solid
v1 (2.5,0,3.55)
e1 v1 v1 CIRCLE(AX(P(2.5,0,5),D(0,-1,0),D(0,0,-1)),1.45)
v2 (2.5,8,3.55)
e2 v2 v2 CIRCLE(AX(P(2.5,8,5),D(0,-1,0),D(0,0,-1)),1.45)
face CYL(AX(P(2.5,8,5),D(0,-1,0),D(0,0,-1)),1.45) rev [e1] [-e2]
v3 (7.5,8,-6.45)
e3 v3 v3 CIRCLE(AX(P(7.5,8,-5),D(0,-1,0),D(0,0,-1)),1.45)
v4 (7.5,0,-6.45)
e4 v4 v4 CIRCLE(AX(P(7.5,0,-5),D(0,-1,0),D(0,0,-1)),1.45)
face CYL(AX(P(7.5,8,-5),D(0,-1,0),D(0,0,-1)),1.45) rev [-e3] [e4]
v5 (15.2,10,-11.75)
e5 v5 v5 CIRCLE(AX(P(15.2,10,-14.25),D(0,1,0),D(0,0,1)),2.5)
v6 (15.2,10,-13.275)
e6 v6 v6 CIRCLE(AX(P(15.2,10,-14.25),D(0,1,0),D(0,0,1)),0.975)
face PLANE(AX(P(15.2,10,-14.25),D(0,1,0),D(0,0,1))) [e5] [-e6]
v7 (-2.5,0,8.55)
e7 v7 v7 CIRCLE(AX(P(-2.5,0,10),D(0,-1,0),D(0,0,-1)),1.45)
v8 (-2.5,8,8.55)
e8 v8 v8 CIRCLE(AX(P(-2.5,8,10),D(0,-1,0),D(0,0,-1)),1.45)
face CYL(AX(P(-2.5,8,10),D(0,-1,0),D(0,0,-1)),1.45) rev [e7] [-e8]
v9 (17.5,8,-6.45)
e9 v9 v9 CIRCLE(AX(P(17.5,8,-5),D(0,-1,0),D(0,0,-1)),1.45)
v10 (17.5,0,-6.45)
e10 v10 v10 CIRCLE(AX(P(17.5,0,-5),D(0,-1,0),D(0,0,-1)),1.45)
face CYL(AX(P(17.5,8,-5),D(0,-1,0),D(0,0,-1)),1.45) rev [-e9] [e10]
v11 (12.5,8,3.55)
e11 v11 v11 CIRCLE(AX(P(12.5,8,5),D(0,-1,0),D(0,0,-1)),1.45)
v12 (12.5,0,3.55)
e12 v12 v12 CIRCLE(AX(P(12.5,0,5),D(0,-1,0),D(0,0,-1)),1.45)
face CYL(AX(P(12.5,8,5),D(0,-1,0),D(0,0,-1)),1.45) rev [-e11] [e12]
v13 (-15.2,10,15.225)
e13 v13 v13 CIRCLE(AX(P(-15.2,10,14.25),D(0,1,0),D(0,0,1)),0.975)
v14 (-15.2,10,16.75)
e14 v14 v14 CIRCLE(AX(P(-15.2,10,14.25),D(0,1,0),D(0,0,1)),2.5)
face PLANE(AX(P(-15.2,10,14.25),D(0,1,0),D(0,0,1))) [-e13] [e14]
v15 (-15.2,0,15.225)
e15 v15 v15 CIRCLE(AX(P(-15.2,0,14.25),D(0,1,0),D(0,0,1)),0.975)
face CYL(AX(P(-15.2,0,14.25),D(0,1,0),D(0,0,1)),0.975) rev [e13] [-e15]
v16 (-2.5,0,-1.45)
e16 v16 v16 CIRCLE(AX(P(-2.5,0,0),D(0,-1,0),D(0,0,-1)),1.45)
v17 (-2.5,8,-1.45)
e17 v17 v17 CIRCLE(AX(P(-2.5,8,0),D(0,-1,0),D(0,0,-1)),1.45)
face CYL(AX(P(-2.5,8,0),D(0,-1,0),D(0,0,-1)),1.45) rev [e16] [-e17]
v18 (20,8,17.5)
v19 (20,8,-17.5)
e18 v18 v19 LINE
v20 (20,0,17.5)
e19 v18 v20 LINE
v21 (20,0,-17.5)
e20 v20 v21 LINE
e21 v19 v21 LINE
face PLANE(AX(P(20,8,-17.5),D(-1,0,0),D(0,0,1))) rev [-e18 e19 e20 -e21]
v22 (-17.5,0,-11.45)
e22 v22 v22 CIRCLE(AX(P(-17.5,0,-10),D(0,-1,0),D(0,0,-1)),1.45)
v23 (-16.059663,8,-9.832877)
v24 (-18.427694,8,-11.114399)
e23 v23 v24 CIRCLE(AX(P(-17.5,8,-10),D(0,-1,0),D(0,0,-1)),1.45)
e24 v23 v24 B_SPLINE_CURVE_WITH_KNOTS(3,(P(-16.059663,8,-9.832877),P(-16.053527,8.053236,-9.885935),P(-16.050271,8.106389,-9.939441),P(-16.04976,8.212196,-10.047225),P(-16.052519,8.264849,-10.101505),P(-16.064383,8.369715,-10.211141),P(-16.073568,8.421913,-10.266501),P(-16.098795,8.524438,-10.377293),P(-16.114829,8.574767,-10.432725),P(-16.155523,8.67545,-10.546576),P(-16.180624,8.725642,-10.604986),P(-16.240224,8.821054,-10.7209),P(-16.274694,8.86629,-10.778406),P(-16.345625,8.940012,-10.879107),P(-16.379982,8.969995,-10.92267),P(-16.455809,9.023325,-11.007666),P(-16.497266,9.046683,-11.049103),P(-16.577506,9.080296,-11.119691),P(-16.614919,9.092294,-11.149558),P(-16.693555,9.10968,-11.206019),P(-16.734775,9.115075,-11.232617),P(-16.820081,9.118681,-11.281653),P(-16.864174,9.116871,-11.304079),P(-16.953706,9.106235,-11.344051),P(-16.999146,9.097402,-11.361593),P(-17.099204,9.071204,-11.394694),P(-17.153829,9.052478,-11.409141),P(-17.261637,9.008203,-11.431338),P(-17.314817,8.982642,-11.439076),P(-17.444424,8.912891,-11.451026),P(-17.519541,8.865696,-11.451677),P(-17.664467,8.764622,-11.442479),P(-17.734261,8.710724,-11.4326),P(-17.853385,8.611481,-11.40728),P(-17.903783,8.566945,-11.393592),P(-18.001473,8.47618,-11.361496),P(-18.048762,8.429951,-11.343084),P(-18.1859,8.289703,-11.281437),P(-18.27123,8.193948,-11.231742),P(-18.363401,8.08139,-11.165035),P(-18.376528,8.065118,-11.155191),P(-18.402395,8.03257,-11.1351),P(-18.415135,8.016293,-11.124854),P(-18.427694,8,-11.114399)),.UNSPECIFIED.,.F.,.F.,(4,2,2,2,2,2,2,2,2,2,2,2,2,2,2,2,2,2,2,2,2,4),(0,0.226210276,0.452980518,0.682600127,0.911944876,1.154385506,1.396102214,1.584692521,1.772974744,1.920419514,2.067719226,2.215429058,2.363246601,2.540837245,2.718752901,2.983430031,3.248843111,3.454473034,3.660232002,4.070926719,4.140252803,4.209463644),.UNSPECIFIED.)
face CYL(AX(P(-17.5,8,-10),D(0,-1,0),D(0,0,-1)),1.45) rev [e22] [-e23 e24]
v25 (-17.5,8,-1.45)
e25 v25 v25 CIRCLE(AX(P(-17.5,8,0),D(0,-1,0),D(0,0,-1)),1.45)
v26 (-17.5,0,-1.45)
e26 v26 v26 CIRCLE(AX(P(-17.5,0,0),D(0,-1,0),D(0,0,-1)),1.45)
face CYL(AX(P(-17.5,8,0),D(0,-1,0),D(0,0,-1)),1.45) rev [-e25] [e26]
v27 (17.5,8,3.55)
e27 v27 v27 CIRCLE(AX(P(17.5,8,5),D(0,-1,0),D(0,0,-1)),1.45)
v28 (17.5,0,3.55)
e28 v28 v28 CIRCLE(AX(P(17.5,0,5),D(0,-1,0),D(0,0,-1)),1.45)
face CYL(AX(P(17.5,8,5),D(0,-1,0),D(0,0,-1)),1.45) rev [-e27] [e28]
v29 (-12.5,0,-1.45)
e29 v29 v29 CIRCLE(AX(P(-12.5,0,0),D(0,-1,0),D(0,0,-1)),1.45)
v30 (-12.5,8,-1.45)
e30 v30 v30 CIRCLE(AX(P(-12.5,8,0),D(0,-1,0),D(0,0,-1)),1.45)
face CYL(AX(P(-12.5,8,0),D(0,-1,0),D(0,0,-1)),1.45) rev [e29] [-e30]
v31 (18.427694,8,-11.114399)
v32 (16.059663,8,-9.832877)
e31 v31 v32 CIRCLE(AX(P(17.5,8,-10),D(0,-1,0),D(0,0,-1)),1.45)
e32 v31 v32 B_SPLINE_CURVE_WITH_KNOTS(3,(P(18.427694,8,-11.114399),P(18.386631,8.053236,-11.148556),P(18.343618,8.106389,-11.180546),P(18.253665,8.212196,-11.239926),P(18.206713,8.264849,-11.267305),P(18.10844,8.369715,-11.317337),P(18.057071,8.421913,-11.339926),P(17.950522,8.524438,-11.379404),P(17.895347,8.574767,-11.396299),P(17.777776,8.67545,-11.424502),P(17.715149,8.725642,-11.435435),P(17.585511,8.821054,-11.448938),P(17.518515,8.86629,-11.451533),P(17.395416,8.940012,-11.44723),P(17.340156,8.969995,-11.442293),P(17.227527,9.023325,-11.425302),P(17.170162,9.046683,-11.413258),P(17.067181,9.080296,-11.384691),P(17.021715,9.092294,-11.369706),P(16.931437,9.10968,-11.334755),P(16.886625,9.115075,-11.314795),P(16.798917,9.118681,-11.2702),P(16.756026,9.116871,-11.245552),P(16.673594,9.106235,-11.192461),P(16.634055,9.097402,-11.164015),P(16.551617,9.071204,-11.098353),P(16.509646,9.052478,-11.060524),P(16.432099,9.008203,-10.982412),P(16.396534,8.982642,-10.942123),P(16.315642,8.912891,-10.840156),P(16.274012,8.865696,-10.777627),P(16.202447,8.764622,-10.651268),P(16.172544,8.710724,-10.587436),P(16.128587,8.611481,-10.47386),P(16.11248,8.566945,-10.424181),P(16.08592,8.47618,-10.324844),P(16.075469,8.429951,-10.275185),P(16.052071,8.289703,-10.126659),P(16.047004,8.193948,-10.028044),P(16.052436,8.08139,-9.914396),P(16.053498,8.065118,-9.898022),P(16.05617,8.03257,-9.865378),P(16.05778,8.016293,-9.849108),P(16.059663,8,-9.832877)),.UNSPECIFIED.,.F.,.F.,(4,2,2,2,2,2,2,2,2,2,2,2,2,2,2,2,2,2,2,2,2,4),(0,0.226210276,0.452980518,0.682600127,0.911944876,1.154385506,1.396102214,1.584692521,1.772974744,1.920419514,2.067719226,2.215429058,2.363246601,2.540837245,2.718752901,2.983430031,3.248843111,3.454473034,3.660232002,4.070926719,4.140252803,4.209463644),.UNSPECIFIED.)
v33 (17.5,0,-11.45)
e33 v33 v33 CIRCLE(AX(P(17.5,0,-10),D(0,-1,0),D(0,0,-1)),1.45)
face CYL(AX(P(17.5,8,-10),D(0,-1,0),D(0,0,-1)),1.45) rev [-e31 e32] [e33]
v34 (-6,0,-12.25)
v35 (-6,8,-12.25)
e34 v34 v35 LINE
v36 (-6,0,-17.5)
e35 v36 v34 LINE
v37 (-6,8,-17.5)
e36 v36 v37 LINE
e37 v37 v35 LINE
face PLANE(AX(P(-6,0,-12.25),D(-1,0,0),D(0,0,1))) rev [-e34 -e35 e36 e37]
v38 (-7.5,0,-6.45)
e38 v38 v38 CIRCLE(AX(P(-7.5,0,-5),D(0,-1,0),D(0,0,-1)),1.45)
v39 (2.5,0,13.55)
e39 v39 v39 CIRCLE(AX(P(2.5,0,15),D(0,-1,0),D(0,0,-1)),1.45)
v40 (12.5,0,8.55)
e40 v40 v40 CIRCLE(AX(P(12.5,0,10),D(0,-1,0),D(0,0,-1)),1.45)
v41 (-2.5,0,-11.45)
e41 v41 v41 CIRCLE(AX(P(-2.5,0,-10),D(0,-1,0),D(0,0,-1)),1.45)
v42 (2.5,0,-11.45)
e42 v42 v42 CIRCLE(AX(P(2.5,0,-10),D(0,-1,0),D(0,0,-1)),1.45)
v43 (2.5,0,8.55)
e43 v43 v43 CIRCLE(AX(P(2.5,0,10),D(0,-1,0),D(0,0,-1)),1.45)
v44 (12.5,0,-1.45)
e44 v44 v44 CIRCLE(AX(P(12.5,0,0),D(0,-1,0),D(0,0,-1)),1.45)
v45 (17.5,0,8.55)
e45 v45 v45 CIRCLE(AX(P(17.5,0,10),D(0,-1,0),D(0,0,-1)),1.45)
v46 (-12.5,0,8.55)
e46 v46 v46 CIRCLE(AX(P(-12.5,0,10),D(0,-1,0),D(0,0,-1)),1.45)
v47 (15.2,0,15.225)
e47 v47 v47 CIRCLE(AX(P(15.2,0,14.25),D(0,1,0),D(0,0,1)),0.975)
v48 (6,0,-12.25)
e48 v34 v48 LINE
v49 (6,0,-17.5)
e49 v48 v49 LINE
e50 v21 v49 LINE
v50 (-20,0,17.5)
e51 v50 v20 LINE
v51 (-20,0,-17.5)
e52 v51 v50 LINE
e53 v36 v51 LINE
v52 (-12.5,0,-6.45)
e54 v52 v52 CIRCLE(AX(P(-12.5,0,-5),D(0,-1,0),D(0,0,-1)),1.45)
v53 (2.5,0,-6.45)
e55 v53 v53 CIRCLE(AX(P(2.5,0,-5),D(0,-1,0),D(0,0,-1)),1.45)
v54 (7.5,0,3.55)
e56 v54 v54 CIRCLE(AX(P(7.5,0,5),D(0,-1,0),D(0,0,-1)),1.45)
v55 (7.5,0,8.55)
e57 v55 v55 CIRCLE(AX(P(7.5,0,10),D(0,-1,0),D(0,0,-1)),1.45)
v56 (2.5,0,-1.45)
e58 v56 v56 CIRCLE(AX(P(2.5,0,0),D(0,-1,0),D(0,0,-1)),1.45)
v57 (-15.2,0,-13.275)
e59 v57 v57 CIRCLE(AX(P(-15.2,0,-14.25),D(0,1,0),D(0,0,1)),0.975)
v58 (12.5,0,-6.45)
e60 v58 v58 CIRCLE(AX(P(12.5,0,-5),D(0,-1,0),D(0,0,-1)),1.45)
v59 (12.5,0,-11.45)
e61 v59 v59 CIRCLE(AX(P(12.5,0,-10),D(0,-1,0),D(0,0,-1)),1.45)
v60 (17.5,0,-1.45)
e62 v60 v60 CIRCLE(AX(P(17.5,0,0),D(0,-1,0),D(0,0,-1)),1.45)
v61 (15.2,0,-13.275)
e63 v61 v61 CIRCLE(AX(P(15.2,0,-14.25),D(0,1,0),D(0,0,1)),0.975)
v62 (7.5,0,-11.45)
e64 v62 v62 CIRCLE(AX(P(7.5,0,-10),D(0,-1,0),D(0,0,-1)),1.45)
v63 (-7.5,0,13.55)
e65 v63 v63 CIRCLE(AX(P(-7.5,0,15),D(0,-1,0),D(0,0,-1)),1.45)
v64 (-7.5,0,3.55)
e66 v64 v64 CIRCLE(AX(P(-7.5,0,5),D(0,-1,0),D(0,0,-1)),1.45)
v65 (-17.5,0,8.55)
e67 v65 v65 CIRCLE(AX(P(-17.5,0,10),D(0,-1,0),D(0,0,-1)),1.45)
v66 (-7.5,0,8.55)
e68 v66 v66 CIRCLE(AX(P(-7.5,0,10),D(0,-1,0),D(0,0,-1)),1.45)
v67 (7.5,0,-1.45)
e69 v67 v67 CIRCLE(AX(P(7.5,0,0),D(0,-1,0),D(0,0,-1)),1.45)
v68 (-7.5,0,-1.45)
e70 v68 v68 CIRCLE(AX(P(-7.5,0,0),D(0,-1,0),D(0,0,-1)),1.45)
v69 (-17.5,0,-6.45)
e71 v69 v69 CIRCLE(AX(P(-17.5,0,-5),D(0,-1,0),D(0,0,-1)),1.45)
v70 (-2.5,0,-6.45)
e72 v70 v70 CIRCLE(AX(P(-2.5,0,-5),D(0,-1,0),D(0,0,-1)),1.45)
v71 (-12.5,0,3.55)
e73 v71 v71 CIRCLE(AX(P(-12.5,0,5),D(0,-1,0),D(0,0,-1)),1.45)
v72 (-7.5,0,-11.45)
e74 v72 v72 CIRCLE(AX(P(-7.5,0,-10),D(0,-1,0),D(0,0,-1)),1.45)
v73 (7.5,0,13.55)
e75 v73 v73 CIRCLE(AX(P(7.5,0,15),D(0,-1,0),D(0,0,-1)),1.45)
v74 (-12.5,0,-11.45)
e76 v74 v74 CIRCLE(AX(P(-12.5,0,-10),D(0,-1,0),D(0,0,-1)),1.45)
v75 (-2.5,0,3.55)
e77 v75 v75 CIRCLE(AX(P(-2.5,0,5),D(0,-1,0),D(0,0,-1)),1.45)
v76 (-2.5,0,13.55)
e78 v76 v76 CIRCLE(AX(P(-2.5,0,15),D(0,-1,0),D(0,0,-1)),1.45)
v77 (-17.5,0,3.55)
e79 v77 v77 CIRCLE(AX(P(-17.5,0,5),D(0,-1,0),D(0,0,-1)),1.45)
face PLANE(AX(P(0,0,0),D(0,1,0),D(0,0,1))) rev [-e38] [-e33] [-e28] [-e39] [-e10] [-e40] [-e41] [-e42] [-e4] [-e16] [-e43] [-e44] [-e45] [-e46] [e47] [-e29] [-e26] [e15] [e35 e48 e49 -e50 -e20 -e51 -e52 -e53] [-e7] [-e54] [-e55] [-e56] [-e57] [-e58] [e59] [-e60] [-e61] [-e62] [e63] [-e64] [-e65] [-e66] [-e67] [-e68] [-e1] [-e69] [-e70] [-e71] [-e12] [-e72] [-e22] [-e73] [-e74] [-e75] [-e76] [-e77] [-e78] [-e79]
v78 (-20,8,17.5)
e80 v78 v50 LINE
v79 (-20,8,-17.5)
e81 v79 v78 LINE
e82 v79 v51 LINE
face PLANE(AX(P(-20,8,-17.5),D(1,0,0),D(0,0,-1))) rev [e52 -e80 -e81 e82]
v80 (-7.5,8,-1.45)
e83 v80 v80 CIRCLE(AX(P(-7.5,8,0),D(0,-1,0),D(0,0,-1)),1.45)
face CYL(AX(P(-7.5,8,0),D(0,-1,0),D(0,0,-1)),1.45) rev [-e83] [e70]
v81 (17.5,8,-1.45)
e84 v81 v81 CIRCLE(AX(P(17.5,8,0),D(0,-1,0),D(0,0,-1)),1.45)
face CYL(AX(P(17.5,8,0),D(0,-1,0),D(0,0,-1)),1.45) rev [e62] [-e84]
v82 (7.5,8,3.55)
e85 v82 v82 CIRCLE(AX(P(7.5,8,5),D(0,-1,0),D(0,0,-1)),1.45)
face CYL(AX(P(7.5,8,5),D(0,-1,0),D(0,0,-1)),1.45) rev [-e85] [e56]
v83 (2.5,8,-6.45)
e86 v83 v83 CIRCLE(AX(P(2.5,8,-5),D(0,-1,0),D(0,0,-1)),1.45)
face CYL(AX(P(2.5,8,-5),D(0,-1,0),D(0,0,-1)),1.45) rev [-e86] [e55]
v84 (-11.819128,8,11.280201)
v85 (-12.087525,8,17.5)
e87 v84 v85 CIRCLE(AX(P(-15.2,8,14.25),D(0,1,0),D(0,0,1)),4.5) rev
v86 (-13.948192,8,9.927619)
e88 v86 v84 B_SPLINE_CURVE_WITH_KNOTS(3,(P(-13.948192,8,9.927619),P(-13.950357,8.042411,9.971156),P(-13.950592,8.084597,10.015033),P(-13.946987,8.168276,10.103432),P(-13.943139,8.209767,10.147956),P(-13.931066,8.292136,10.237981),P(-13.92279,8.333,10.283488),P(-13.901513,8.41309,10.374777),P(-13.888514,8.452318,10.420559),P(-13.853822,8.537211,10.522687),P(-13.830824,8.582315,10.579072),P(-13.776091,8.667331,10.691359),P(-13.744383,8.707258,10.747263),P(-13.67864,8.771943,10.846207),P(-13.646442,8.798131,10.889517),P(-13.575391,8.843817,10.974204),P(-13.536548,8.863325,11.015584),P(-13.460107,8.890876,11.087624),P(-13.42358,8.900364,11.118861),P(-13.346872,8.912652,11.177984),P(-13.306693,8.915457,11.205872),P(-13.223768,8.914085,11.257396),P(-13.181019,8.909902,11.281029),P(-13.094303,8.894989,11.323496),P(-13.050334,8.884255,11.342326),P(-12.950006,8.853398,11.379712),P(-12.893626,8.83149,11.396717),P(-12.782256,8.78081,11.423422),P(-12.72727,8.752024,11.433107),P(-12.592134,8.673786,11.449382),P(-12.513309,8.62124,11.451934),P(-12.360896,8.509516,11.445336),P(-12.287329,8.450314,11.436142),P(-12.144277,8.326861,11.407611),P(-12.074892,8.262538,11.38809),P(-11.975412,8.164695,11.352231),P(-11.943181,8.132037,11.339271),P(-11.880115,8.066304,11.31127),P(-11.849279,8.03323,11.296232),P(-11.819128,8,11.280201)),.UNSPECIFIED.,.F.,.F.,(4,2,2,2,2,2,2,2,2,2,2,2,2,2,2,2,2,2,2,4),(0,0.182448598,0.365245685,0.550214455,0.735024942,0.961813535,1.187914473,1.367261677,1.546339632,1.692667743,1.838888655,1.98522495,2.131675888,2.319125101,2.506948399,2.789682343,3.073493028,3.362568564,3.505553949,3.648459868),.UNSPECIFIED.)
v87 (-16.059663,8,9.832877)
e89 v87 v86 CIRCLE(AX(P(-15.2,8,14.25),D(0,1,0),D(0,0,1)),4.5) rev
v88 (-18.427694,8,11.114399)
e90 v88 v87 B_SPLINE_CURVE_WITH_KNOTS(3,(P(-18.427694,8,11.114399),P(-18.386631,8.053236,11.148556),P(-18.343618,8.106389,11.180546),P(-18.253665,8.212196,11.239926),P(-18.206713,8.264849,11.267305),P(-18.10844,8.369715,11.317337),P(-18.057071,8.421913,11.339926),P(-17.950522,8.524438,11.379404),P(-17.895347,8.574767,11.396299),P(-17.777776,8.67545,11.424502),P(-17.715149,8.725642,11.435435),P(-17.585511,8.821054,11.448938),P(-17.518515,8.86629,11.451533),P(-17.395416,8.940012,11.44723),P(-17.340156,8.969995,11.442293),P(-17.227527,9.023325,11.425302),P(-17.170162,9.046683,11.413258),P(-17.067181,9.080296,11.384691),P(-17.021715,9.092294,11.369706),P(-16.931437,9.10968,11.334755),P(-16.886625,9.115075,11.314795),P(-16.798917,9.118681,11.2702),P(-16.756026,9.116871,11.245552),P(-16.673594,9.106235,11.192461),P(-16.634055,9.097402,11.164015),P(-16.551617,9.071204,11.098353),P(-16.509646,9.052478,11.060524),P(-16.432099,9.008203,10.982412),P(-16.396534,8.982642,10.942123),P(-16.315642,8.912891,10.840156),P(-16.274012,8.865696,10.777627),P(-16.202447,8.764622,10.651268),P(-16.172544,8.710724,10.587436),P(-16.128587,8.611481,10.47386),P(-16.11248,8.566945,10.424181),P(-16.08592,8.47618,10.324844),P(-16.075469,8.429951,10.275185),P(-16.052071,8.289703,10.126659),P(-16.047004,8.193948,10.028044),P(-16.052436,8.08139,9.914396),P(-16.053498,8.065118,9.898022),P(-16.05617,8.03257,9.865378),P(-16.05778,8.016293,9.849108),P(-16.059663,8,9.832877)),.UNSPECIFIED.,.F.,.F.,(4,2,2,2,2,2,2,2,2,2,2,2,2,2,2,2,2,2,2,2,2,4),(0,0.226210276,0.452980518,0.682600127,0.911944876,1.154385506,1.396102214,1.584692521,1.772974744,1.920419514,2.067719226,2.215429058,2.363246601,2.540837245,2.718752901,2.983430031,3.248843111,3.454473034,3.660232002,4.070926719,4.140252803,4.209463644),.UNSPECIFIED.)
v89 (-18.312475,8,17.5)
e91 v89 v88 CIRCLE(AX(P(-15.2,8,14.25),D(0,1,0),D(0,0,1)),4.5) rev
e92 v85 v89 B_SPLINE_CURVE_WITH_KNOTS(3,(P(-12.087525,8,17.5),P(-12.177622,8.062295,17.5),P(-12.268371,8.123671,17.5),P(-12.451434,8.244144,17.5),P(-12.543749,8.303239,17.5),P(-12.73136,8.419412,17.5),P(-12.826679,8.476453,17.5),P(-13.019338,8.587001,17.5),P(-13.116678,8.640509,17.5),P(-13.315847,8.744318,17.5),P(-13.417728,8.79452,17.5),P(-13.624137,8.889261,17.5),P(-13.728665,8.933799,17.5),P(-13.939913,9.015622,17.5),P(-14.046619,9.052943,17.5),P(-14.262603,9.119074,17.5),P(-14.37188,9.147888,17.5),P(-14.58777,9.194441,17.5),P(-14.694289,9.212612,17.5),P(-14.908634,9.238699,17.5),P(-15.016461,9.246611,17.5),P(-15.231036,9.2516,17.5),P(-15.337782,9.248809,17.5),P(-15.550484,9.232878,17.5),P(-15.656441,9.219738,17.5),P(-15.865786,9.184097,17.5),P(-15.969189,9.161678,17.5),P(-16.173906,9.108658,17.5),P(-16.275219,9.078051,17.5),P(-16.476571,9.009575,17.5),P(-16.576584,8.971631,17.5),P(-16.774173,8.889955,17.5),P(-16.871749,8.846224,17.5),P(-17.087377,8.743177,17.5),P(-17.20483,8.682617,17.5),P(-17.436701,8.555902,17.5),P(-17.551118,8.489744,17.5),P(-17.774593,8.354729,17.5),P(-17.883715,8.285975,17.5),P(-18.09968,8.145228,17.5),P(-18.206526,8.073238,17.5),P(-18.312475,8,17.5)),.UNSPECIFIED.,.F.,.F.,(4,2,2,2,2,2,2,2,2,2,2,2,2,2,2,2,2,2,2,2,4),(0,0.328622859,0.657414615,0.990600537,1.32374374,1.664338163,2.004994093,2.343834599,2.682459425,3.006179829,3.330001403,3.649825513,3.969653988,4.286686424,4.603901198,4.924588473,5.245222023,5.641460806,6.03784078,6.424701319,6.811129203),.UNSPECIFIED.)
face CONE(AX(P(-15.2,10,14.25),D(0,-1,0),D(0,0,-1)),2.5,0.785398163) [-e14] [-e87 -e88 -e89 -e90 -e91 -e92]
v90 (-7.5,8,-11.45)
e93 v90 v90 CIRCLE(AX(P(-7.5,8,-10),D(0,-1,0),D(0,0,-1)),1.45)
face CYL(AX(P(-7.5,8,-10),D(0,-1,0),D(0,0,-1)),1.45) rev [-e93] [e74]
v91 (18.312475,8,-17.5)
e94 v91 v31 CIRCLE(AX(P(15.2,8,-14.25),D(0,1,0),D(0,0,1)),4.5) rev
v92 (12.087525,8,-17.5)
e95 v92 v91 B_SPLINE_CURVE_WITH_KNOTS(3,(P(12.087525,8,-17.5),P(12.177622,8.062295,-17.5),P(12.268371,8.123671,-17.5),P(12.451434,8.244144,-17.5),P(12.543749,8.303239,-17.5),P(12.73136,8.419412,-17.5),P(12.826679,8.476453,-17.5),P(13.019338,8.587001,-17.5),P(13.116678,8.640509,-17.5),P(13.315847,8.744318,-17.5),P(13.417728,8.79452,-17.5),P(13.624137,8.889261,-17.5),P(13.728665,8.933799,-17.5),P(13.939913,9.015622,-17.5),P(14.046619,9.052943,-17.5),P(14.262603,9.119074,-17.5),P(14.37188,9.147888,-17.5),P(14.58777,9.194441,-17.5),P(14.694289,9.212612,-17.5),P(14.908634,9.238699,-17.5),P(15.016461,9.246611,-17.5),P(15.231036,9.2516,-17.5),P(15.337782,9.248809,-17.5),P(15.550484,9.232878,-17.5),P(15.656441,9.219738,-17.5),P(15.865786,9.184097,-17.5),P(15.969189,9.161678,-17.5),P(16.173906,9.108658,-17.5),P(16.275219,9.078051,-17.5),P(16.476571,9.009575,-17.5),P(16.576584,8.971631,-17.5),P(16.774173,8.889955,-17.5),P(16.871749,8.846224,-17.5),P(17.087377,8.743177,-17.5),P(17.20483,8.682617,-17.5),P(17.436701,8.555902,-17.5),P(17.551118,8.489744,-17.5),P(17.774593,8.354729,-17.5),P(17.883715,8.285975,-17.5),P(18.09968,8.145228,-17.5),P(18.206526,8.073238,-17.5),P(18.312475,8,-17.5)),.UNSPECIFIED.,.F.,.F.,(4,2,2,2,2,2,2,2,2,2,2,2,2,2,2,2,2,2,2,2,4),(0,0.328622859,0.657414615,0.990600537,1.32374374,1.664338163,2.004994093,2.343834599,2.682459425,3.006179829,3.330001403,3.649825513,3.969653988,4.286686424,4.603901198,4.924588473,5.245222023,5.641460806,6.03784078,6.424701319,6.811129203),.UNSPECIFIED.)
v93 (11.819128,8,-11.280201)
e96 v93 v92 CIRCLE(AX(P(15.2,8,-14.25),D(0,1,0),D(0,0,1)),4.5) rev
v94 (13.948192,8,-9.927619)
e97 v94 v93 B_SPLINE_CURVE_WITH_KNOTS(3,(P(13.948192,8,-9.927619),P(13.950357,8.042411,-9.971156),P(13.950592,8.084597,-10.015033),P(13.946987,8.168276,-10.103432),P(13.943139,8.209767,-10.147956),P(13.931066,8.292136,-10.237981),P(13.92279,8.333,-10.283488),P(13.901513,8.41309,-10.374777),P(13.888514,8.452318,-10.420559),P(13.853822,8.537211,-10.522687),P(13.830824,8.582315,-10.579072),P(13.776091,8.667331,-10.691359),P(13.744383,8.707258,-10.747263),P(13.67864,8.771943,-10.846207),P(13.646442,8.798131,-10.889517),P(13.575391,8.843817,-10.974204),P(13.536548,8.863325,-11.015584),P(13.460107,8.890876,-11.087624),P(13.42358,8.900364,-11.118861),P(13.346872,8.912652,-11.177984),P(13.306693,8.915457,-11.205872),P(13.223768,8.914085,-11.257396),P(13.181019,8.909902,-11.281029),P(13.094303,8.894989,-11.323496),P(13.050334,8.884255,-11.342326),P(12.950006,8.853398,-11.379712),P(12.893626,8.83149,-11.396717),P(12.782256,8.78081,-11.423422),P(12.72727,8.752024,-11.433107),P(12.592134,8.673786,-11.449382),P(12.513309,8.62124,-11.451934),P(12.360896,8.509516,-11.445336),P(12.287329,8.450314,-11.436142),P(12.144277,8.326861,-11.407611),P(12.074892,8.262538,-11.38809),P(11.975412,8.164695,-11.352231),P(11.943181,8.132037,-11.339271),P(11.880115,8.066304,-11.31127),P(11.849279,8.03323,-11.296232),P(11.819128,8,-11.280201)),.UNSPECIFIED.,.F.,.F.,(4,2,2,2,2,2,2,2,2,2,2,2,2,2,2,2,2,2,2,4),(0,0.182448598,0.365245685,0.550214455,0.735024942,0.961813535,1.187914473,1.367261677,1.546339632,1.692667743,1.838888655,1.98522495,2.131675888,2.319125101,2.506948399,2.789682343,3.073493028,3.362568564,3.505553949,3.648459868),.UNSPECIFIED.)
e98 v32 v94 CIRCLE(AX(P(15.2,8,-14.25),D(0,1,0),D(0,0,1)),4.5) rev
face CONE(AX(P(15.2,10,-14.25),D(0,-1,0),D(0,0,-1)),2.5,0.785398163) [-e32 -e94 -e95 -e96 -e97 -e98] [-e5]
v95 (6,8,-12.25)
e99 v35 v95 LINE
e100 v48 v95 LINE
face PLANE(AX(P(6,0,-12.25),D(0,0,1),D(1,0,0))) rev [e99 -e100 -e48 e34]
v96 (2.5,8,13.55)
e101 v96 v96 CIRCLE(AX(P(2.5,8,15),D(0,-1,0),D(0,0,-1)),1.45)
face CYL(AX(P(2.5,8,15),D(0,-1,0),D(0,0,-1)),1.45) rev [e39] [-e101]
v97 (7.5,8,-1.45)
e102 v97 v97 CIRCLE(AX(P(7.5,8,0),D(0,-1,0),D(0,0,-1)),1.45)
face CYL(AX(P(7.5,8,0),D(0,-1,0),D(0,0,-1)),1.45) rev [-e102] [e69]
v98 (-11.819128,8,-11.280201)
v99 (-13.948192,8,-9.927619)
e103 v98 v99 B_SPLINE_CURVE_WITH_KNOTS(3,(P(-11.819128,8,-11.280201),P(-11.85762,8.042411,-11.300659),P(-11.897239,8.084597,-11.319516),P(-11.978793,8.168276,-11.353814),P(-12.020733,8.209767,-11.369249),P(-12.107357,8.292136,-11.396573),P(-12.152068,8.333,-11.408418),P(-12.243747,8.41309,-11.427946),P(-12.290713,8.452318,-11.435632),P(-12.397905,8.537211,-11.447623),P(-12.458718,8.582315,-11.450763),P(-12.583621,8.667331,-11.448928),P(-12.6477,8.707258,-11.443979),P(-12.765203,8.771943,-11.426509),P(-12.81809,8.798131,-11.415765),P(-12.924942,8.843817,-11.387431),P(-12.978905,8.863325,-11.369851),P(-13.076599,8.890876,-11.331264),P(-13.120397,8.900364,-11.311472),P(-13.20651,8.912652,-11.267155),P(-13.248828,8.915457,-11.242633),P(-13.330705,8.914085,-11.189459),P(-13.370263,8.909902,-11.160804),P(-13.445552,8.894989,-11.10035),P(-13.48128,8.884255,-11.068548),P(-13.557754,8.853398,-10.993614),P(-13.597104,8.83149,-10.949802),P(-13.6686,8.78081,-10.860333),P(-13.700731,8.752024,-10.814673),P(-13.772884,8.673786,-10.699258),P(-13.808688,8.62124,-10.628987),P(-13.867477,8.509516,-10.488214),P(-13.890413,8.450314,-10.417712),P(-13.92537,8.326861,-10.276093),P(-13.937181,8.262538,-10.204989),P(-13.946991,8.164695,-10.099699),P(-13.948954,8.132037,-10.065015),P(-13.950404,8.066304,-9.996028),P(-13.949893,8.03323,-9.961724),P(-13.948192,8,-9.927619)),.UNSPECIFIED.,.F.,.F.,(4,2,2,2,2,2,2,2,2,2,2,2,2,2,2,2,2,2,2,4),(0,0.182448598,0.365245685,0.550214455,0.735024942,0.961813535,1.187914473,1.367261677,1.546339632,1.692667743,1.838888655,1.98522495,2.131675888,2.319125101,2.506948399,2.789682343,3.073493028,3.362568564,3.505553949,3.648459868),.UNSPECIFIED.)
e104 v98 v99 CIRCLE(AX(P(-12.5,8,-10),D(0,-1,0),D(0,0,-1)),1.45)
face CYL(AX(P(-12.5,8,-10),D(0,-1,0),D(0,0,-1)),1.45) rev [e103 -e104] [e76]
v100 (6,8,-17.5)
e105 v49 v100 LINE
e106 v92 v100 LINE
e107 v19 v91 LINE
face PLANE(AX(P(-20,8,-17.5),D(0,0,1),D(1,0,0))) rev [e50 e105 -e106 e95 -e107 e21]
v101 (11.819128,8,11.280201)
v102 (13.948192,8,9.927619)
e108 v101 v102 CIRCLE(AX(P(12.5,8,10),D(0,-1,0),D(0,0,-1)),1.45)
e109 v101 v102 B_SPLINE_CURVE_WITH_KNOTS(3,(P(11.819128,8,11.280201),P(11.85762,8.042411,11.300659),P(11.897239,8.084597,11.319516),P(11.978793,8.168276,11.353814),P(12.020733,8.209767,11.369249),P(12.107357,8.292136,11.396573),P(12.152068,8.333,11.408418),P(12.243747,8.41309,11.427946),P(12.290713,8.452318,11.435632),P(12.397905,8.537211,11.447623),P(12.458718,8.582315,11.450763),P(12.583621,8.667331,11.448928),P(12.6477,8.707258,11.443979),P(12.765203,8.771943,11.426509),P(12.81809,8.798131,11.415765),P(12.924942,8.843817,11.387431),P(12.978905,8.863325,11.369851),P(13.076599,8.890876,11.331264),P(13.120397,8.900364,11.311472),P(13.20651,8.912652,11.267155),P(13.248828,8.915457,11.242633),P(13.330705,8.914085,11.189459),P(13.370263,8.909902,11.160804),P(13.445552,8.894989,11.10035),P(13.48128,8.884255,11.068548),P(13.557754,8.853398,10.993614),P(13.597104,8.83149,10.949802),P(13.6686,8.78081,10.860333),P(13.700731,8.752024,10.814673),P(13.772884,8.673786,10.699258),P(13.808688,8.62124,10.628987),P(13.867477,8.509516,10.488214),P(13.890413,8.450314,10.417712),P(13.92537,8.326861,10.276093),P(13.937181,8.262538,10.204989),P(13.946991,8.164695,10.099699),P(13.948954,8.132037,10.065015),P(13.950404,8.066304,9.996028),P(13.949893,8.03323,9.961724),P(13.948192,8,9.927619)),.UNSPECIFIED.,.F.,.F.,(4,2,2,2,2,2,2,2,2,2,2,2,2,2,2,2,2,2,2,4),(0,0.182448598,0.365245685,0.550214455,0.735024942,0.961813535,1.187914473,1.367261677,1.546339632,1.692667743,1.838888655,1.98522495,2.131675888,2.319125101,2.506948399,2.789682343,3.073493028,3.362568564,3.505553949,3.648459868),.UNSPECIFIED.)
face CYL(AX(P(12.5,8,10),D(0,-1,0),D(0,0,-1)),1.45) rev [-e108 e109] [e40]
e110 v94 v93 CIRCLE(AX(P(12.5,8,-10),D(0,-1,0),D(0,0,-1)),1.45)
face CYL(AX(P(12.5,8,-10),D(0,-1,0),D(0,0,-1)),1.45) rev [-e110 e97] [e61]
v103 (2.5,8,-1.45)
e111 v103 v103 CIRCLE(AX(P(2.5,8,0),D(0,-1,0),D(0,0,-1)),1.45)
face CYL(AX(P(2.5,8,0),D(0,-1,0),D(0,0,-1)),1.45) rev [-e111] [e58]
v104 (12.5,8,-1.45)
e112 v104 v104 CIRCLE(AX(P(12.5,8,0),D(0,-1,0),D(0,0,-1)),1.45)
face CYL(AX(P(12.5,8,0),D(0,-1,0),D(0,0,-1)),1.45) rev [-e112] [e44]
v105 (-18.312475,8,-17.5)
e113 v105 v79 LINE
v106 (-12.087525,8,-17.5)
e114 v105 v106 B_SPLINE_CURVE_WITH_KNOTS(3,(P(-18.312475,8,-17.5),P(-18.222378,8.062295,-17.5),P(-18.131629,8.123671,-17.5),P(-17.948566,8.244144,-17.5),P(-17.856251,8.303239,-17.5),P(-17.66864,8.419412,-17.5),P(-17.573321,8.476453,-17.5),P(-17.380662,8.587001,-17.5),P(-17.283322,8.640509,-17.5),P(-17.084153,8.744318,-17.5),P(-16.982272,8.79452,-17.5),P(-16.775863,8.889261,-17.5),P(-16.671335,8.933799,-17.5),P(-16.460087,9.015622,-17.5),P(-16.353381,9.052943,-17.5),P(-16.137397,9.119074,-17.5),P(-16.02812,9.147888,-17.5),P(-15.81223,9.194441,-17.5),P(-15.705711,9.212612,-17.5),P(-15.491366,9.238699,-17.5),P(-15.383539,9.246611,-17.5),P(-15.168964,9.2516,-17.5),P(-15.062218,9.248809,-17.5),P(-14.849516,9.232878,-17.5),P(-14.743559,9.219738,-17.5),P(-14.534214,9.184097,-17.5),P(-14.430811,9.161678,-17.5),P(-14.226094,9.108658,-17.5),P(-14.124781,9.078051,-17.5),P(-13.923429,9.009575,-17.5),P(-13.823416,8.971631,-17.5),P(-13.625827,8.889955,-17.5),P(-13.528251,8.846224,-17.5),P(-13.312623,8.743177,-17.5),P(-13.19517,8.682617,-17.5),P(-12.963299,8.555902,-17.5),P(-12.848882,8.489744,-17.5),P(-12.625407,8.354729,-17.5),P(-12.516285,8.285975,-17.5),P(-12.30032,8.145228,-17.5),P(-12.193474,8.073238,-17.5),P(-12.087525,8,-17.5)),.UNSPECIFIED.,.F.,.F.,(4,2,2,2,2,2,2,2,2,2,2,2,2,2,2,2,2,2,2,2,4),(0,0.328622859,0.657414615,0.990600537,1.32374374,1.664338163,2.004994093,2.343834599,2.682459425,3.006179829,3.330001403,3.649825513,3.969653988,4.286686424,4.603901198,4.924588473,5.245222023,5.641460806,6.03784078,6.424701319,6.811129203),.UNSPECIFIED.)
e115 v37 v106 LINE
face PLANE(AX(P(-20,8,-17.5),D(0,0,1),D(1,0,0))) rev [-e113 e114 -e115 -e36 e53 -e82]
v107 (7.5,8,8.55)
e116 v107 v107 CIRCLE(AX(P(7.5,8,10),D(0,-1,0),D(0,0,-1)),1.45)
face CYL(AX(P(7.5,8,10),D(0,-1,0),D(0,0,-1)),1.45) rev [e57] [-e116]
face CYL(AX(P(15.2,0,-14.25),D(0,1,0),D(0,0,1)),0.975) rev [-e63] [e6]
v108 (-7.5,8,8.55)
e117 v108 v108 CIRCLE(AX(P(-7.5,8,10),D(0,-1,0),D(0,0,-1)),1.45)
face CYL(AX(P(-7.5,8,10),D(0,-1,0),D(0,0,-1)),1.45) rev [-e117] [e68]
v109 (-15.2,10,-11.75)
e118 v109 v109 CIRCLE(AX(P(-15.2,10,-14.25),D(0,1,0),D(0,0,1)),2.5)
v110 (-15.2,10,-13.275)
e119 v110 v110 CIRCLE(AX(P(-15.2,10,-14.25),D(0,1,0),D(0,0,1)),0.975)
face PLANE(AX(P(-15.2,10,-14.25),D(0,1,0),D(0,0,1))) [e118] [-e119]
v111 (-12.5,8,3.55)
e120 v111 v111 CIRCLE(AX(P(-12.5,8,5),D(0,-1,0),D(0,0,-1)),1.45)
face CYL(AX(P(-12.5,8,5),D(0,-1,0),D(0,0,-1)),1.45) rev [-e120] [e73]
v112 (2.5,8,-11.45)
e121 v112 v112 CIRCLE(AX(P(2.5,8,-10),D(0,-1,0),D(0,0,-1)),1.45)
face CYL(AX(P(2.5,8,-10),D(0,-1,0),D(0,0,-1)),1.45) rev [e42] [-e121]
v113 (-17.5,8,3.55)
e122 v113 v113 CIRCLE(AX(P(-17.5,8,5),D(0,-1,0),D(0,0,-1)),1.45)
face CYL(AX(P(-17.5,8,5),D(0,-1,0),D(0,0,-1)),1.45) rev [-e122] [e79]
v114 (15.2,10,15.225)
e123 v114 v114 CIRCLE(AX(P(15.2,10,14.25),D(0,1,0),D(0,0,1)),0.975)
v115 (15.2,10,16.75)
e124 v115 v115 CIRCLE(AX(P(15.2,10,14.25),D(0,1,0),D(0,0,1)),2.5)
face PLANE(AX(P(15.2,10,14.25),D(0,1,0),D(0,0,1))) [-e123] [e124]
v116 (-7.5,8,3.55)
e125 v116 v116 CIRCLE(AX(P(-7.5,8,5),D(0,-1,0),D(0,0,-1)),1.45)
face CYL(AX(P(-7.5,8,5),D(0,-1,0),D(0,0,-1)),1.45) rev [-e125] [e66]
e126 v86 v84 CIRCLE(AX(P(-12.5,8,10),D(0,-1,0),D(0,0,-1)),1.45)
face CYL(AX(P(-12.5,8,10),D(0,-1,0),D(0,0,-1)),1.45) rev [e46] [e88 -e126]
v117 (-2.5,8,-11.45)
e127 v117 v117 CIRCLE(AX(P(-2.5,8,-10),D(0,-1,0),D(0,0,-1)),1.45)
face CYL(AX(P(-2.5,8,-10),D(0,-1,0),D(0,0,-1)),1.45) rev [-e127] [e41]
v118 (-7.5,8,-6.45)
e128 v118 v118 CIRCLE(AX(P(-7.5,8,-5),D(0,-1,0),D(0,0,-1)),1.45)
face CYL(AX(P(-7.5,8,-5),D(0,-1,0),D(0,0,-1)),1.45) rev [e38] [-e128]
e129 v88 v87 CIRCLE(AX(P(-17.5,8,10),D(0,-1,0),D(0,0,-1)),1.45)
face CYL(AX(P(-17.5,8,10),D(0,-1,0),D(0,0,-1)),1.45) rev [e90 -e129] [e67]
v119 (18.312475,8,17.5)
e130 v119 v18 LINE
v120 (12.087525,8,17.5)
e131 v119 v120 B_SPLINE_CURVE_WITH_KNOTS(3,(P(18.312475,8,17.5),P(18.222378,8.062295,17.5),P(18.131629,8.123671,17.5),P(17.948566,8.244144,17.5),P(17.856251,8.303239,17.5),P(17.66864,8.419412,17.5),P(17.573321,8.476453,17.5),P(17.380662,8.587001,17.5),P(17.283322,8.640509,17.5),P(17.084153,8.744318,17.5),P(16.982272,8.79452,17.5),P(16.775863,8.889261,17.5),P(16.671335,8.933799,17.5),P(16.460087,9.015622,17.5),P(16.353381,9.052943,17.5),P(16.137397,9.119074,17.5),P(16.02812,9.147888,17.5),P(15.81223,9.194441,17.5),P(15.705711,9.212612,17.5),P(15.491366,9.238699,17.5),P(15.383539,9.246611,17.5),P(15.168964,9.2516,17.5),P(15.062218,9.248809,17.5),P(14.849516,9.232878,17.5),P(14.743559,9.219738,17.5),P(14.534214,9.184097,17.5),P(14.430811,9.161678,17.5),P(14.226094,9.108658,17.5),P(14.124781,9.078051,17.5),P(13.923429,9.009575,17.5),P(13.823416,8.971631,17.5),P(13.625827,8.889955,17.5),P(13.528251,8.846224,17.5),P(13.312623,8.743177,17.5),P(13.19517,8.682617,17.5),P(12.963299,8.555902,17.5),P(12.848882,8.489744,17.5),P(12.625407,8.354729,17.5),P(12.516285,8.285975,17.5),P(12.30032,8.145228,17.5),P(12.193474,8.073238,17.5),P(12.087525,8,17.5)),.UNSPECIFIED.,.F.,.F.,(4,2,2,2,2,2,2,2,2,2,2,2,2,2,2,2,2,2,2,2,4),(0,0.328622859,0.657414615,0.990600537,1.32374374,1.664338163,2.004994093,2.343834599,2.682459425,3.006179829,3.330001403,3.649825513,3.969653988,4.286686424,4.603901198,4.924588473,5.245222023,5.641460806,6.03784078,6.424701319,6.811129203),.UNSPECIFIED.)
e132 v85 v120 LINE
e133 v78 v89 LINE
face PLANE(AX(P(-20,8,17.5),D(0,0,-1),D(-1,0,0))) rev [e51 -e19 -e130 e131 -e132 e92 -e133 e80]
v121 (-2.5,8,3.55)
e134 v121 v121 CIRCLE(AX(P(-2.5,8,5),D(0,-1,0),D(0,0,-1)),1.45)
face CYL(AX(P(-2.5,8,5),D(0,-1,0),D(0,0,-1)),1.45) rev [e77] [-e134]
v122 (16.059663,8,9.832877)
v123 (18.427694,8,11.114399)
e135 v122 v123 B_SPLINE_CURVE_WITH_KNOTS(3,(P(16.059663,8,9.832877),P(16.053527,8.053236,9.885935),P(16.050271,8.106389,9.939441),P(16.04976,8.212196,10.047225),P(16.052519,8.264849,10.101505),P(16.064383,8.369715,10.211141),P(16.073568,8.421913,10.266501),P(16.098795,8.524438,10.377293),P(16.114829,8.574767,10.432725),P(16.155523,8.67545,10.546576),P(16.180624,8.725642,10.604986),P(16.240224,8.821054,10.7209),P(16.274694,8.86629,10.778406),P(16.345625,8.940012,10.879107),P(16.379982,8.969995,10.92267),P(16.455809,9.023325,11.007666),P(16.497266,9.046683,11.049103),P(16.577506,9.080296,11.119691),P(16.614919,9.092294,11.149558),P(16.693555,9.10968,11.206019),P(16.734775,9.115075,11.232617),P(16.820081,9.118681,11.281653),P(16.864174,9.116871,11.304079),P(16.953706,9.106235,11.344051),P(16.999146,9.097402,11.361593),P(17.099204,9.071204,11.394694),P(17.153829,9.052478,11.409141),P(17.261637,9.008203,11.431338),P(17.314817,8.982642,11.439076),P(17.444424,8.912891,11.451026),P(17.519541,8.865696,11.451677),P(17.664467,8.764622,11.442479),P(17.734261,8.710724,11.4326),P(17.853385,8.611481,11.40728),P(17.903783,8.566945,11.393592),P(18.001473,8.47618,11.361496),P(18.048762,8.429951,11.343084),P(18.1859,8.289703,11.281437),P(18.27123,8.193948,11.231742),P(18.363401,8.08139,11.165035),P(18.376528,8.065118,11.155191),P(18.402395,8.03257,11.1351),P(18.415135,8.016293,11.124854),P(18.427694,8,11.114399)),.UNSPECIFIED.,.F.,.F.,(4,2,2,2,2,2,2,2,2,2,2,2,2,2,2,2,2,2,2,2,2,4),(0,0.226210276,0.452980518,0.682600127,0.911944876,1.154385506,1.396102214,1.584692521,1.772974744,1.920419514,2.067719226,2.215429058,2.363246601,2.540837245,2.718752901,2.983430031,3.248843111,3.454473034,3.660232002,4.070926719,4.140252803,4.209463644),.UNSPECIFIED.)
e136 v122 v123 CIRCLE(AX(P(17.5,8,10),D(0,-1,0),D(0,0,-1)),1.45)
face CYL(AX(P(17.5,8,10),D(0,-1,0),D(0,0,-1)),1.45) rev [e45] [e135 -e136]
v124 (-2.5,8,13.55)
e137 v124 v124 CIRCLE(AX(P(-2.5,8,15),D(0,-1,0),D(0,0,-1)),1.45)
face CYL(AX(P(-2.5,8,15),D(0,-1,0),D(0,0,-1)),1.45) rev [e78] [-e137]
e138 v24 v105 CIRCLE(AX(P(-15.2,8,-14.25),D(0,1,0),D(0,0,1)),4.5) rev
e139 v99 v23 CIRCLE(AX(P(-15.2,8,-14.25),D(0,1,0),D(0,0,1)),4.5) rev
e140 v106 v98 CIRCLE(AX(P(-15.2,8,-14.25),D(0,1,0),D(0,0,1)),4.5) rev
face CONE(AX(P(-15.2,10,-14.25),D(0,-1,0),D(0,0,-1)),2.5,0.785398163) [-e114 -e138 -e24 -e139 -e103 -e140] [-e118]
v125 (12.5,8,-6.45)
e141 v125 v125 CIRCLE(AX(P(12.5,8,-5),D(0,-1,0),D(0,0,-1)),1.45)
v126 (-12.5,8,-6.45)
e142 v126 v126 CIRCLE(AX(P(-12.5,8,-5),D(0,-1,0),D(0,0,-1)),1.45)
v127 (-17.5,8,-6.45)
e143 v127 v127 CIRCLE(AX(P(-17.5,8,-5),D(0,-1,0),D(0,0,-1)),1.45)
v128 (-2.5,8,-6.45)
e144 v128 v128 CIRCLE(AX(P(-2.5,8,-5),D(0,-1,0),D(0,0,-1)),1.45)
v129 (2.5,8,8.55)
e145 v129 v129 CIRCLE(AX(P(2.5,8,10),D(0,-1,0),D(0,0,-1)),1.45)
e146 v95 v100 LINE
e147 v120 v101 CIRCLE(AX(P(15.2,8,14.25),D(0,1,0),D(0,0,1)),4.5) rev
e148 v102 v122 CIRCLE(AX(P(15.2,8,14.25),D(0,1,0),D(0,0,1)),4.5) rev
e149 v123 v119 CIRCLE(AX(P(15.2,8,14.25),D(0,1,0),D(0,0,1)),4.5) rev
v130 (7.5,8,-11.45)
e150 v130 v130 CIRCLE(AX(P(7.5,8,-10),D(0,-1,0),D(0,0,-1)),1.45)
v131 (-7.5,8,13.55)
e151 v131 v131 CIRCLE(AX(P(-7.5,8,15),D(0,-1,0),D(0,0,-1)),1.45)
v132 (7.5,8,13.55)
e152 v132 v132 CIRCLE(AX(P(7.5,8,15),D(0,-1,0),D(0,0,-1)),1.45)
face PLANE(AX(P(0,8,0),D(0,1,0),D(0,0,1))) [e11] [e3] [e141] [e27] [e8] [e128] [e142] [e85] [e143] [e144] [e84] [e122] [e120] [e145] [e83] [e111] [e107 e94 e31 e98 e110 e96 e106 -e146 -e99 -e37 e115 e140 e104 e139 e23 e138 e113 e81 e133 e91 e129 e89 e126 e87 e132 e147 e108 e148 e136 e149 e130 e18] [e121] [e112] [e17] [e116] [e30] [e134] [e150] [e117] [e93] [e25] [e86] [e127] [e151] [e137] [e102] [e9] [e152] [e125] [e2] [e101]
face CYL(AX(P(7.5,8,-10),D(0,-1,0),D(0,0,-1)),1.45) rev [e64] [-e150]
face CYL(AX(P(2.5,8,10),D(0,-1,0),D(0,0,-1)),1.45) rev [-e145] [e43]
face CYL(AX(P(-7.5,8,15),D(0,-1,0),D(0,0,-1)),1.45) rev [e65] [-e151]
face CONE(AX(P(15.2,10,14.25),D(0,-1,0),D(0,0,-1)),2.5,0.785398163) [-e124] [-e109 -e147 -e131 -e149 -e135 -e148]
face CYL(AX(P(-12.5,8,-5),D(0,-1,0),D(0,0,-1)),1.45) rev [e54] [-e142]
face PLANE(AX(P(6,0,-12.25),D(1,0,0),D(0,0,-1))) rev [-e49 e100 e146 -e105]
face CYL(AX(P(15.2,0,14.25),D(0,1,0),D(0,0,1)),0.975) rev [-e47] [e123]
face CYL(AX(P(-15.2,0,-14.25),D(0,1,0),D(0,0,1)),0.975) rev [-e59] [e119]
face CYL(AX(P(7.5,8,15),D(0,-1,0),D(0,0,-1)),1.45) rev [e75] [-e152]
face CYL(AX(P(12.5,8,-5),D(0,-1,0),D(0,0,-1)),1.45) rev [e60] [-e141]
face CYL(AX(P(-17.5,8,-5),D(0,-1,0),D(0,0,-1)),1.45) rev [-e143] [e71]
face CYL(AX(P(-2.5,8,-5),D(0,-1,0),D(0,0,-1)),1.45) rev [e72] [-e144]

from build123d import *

# Parameters (mm, degrees)
SKETCH1_W                       = 40
SKETCH1_H                       = 35
BOSS_EXTRUDE1_DEPTH             = 8
SKETCH5_R                       = 1.45
CUT_EXTRUDE3_DEPTH              = 28.753378173
LPATTERN1_COUNT                 = 8
LPATTERN1_PITCH                 = 5
LPATTERN1_COUNT_DIR2            = 7
LPATTERN1_PITCH_DIR2            = 5
SKETCH2_R                       = 2.5
BOSS_EXTRUDE2_DEPTH             = 2
BOSS_EXTRUDE2_DIRECTION_2_REACH = 29.753
BOSS_EXTRUDE3_START             = -8
SKETCH6_R                       = 1.45
BOSS_EXTRUDE3_DEPTH             = 8
SKETCH3_R                       = 0.975
CUT_EXTRUDE1_DEPTH              = 29.394541729
SKETCH4_W                       = 12
SKETCH4_H                       = 5.25
CUT_EXTRUDE2_DEPTH              = 28.753378173
CHAMFER1_SIZE                   = 2


with BuildPart() as part:
    # Sketch1 → Boss-Extrude1 (new body)
    with BuildSketch(Plane(origin=(0, 0, 0), x_dir=(1, 0, 0), z_dir=(0, 1, 0))):
        Rectangle(SKETCH1_W, SKETCH1_H)
    extrude(amount=BOSS_EXTRUDE1_DEPTH)

    # Sketch5 → Cut-Extrude3 (cut, through all)
    with BuildSketch(Plane.XZ):
        with Locations(Location((-17.5, 15, 0), (0, 0, 270))):
            Circle(SKETCH5_R)
    cut_extrude3 = extrude(amount=-CUT_EXTRUDE3_DEPTH, mode=Mode.SUBTRACT)

    # LPattern1: Cut-Extrude3 8 × 7, 11 skipped
    with Locations(*[(i * LPATTERN1_PITCH, 0, -j * LPATTERN1_PITCH_DIR2) for i in range(LPATTERN1_COUNT) for j in range(LPATTERN1_COUNT_DIR2) if (i, j) not in ((0, 0), (0, 6), (1, 0), (1, 6), (2, 6), (3, 6), (4, 6), (5, 6), (6, 0), (6, 6), (7, 0), (7, 6))]):
        add(cut_extrude3, mode=Mode.SUBTRACT)

    # Sketch2 → Boss-Extrude2 (add)
    with BuildSketch(Plane(origin=(0, 8, 0), x_dir=(1, 0, 0), z_dir=(0, 1, 0))):
        with Locations(Location((-15.2, 14.25, 0), (0, 0, 270))):
            Circle(SKETCH2_R)
        with Locations(Location((15.2, 14.25, 0), (0, 0, 270))):
            Circle(SKETCH2_R)
        with Locations(Location((15.2, -14.25, 0), (0, 0, 270))):
            Circle(SKETCH2_R)
        with Locations(Location((-15.2, -14.25, 0), (0, 0, 270))):
            Circle(SKETCH2_R)
    extrude(amount=BOSS_EXTRUDE2_DEPTH)

    # Boss-Extrude2 direction 2: up to this face of the body (flat: up to its plane)
    boss_extrude2_direction_2_end = Plane(part.part.faces().sort_by_distance((0.104819126, 0, -0.449224824))[0])
    # Sketch2 → Boss-Extrude2 direction 2 (add, up to the picked face)
    with BuildSketch(Plane(origin=(0, 8, 0), x_dir=(1, 0, 0), z_dir=(0, 1, 0)), mode=Mode.PRIVATE) as boss_extrude2_direction_2_sk1:
        with Locations(Location((-15.2, 14.25, 0), (0, 0, 270))):
            Circle(SKETCH2_R)
    boss_extrude2_direction_2_tool1 = split(extrude(boss_extrude2_direction_2_sk1.sketch, amount=-BOSS_EXTRUDE2_DIRECTION_2_REACH, mode=Mode.PRIVATE), bisect_by=boss_extrude2_direction_2_end, keep=Keep.BOTH, mode=Mode.PRIVATE)
    # Sketch2 → Boss-Extrude2 direction 2 (add, up to the picked face)
    with BuildSketch(Plane(origin=(0, 8, 0), x_dir=(1, 0, 0), z_dir=(0, 1, 0)), mode=Mode.PRIVATE) as boss_extrude2_direction_2_sk2:
        with Locations(Location((15.2, 14.25, 0), (0, 0, 270))):
            Circle(SKETCH2_R)
    boss_extrude2_direction_2_tool2 = split(extrude(boss_extrude2_direction_2_sk2.sketch, amount=-BOSS_EXTRUDE2_DIRECTION_2_REACH, mode=Mode.PRIVATE), bisect_by=boss_extrude2_direction_2_end, keep=Keep.BOTH, mode=Mode.PRIVATE)
    # Sketch2 → Boss-Extrude2 direction 2 (add, up to the picked face)
    with BuildSketch(Plane(origin=(0, 8, 0), x_dir=(1, 0, 0), z_dir=(0, 1, 0)), mode=Mode.PRIVATE) as boss_extrude2_direction_2_sk3:
        with Locations(Location((15.2, -14.25, 0), (0, 0, 270))):
            Circle(SKETCH2_R)
    boss_extrude2_direction_2_tool3 = split(extrude(boss_extrude2_direction_2_sk3.sketch, amount=-BOSS_EXTRUDE2_DIRECTION_2_REACH, mode=Mode.PRIVATE), bisect_by=boss_extrude2_direction_2_end, keep=Keep.BOTH, mode=Mode.PRIVATE)
    # Sketch2 → Boss-Extrude2 direction 2 (add, up to the picked face)
    with BuildSketch(Plane(origin=(0, 8, 0), x_dir=(1, 0, 0), z_dir=(0, 1, 0)), mode=Mode.PRIVATE) as boss_extrude2_direction_2_sk4:
        with Locations(Location((-15.2, -14.25, 0), (0, 0, 270))):
            Circle(SKETCH2_R)
    boss_extrude2_direction_2_tool4 = split(extrude(boss_extrude2_direction_2_sk4.sketch, amount=-BOSS_EXTRUDE2_DIRECTION_2_REACH, mode=Mode.PRIVATE), bisect_by=boss_extrude2_direction_2_end, keep=Keep.BOTH, mode=Mode.PRIVATE)
    add(boss_extrude2_direction_2_tool1.solids().sort_by(Axis((-15.2, 8, -14.25), (0, -1, 0)))[0])
    add(boss_extrude2_direction_2_tool2.solids().sort_by(Axis((15.2, 8, -14.25), (0, -1, 0)))[0])
    add(boss_extrude2_direction_2_tool3.solids().sort_by(Axis((15.2, 8, 14.25), (0, -1, 0)))[0])
    add(boss_extrude2_direction_2_tool4.solids().sort_by(Axis((-15.2, 8, 14.25), (0, -1, 0)))[0])

    # Sketch6 → Boss-Extrude3 (add)
    with BuildSketch(Plane(origin=(0, 8, 0), x_dir=(1, 0, 0), z_dir=(0, 1, 0)).offset(BOSS_EXTRUDE3_START)):
        with Locations((-17.5, -15)):
            Circle(SKETCH6_R)
    extrude(amount=BOSS_EXTRUDE3_DEPTH)

    # Sketch3 → Cut-Extrude1 (cut, through all)
    with BuildSketch(Plane(origin=(0, 10, 0), x_dir=(1, 0, 0), z_dir=(0, 1, 0))):
        with Locations(Location((-15.2, 14.25, 0), (0, 0, 270))):
            Circle(SKETCH3_R)
        with Locations(Location((15.2, 14.25, 0), (0, 0, 270))):
            Circle(SKETCH3_R)
        with Locations(Location((-15.2, -14.25, 0), (0, 0, 270))):
            Circle(SKETCH3_R)
        with Locations(Location((15.2, -14.25, 0), (0, 0, 270))):
            Circle(SKETCH3_R)
    extrude(amount=-CUT_EXTRUDE1_DEPTH, mode=Mode.SUBTRACT)

    # Sketch4 → Cut-Extrude2 (cut, through all)
    with BuildSketch(Plane(origin=(0, 8, 0), x_dir=(1, 0, 0), z_dir=(0, 1, 0))):
        with Locations((0, 14.875)):
            Rectangle(SKETCH4_W, SKETCH4_H)
    extrude(amount=-CUT_EXTRUDE2_DEPTH, mode=Mode.SUBTRACT)

    # Chamfer1
    # the kernel refuses this chamfer: 2 mm, written as the material it adds along each edge
    with BuildSketch(Plane(origin=(-15.2, 8, -14.25), x_dir=(0, 0, 1), z_dir=(-1, 0, 0))) as chamfer1_piece_1_section:
        Polygon((2.5 + CHAMFER1_SIZE, 0), (2.5, CHAMFER1_SIZE), (2.5, 0), align=None)
    chamfer1_piece_1 = revolve(axis=Axis((-15.2, 8, -14.25), (0, 1, 0)), mode=Mode.PRIVATE)
    chamfer1_piece_1 = split(chamfer1_piece_1, bisect_by=Plane(origin=(-11.571473912, 8.26224679, -17.5), z_dir=(0, 0, 1)), keep=Keep.TOP, mode=Mode.PRIVATE)
    chamfer1_piece_1 = chamfer1_piece_1 - Plane(origin=(-12.5, 8.26224679, -10), x_dir=(0, 0, -1), z_dir=(0, -1, 0)) * Cylinder(1.45, 18, mode=Mode.PRIVATE)
    chamfer1_piece_1 = chamfer1_piece_1 - Plane(origin=(-17.5, 8.26224679, -10), x_dir=(0, 0, -1), z_dir=(0, -1, 0)) * Cylinder(1.45, 18, mode=Mode.PRIVATE)
    chamfer1_piece_1 = split(chamfer1_piece_1, bisect_by=Plane(origin=(-11.571473912, 10, -12.155069486), z_dir=(0, -1, 0)), keep=Keep.TOP, mode=Mode.PRIVATE)
    add(chamfer1_piece_1)
    with BuildSketch(Plane(origin=(15.2, 8, -14.25), x_dir=(0, 0, 1), z_dir=(-1, 0, 0))) as chamfer1_piece_2_section:
        Polygon((2.5 + CHAMFER1_SIZE, 0), (2.5, CHAMFER1_SIZE), (2.5, 0), align=None)
    chamfer1_piece_2 = revolve(axis=Axis((15.2, 8, -14.25), (0, 1, 0)), mode=Mode.PRIVATE)
    chamfer1_piece_2 = split(chamfer1_piece_2, bisect_by=Plane(origin=(18.828526094, 8.262246797, -17.5), z_dir=(0, 0, 1)), keep=Keep.TOP, mode=Mode.PRIVATE)
    chamfer1_piece_2 = chamfer1_piece_2 - Plane(origin=(17.5, 8.262246797, -10), x_dir=(0, 0, -1), z_dir=(0, -1, 0)) * Cylinder(1.45, 18, mode=Mode.PRIVATE)
    chamfer1_piece_2 = chamfer1_piece_2 - Plane(origin=(12.5, 8.262246797, -10), x_dir=(0, 0, -1), z_dir=(0, -1, 0)) * Cylinder(1.45, 18, mode=Mode.PRIVATE)
    chamfer1_piece_2 = split(chamfer1_piece_2, bisect_by=Plane(origin=(18.828526094, 10, -12.155069483), z_dir=(0, -1, 0)), keep=Keep.TOP, mode=Mode.PRIVATE)
    add(chamfer1_piece_2)
    with BuildSketch(Plane(origin=(15.2, 8, 14.25), x_dir=(0, 0, 1), z_dir=(-1, 0, 0))) as chamfer1_piece_3_section:
        Polygon((2.5 + CHAMFER1_SIZE, 0), (2.5, CHAMFER1_SIZE), (2.5, 0), align=None)
    chamfer1_piece_3 = revolve(axis=Axis((15.2, 8, 14.25), (0, 1, 0)), mode=Mode.PRIVATE)
    chamfer1_piece_3 = split(chamfer1_piece_3, bisect_by=Plane(origin=(15.2, 8.947769636, 17.5), z_dir=(0, 0, -1)), keep=Keep.TOP, mode=Mode.PRIVATE)
    chamfer1_piece_3 = chamfer1_piece_3 - Plane(origin=(17.5, 8.947769636, 10), x_dir=(0, 0, -1), z_dir=(0, -1, 0)) * Cylinder(1.45, 18, mode=Mode.PRIVATE)
    chamfer1_piece_3 = chamfer1_piece_3 - Plane(origin=(12.5, 8.947769636, 10), x_dir=(0, 0, -1), z_dir=(0, -1, 0)) * Cylinder(1.45, 18, mode=Mode.PRIVATE)
    chamfer1_piece_3 = split(chamfer1_piece_3, bisect_by=Plane(origin=(15.2, 10, 10.745661822), z_dir=(0, -1, 0)), keep=Keep.TOP, mode=Mode.PRIVATE)
    add(chamfer1_piece_3)
    with BuildSketch(Plane(origin=(-15.2, 8, 14.25), x_dir=(0, 0, 1), z_dir=(1, 0, 0))) as chamfer1_piece_4_section:
        Polygon((2.5 + CHAMFER1_SIZE, 0), (2.5, -CHAMFER1_SIZE), (2.5, 0), align=None)
    chamfer1_piece_4 = revolve(axis=Axis((-15.2, 8, 14.25), (0, -1, 0)), mode=Mode.PRIVATE)
    chamfer1_piece_4 = split(chamfer1_piece_4, bisect_by=Plane(origin=(-15.2, 8.947769652, 17.5), z_dir=(0, 0, -1)), keep=Keep.TOP, mode=Mode.PRIVATE)
    chamfer1_piece_4 = chamfer1_piece_4 - Plane(origin=(-12.5, 8.947769652, 10), x_dir=(0, 0, -1), z_dir=(0, -1, 0)) * Cylinder(1.45, 18, mode=Mode.PRIVATE)
    chamfer1_piece_4 = chamfer1_piece_4 - Plane(origin=(-17.5, 8.947769652, 10), x_dir=(0, 0, -1), z_dir=(0, -1, 0)) * Cylinder(1.45, 18, mode=Mode.PRIVATE)
    chamfer1_piece_4 = split(chamfer1_piece_4, bisect_by=Plane(origin=(-15.2, 10, 10.745661805), z_dir=(0, -1, 0)), keep=Keep.TOP, mode=Mode.PRIVATE)
    add(chamfer1_piece_4)


solid = part.part
